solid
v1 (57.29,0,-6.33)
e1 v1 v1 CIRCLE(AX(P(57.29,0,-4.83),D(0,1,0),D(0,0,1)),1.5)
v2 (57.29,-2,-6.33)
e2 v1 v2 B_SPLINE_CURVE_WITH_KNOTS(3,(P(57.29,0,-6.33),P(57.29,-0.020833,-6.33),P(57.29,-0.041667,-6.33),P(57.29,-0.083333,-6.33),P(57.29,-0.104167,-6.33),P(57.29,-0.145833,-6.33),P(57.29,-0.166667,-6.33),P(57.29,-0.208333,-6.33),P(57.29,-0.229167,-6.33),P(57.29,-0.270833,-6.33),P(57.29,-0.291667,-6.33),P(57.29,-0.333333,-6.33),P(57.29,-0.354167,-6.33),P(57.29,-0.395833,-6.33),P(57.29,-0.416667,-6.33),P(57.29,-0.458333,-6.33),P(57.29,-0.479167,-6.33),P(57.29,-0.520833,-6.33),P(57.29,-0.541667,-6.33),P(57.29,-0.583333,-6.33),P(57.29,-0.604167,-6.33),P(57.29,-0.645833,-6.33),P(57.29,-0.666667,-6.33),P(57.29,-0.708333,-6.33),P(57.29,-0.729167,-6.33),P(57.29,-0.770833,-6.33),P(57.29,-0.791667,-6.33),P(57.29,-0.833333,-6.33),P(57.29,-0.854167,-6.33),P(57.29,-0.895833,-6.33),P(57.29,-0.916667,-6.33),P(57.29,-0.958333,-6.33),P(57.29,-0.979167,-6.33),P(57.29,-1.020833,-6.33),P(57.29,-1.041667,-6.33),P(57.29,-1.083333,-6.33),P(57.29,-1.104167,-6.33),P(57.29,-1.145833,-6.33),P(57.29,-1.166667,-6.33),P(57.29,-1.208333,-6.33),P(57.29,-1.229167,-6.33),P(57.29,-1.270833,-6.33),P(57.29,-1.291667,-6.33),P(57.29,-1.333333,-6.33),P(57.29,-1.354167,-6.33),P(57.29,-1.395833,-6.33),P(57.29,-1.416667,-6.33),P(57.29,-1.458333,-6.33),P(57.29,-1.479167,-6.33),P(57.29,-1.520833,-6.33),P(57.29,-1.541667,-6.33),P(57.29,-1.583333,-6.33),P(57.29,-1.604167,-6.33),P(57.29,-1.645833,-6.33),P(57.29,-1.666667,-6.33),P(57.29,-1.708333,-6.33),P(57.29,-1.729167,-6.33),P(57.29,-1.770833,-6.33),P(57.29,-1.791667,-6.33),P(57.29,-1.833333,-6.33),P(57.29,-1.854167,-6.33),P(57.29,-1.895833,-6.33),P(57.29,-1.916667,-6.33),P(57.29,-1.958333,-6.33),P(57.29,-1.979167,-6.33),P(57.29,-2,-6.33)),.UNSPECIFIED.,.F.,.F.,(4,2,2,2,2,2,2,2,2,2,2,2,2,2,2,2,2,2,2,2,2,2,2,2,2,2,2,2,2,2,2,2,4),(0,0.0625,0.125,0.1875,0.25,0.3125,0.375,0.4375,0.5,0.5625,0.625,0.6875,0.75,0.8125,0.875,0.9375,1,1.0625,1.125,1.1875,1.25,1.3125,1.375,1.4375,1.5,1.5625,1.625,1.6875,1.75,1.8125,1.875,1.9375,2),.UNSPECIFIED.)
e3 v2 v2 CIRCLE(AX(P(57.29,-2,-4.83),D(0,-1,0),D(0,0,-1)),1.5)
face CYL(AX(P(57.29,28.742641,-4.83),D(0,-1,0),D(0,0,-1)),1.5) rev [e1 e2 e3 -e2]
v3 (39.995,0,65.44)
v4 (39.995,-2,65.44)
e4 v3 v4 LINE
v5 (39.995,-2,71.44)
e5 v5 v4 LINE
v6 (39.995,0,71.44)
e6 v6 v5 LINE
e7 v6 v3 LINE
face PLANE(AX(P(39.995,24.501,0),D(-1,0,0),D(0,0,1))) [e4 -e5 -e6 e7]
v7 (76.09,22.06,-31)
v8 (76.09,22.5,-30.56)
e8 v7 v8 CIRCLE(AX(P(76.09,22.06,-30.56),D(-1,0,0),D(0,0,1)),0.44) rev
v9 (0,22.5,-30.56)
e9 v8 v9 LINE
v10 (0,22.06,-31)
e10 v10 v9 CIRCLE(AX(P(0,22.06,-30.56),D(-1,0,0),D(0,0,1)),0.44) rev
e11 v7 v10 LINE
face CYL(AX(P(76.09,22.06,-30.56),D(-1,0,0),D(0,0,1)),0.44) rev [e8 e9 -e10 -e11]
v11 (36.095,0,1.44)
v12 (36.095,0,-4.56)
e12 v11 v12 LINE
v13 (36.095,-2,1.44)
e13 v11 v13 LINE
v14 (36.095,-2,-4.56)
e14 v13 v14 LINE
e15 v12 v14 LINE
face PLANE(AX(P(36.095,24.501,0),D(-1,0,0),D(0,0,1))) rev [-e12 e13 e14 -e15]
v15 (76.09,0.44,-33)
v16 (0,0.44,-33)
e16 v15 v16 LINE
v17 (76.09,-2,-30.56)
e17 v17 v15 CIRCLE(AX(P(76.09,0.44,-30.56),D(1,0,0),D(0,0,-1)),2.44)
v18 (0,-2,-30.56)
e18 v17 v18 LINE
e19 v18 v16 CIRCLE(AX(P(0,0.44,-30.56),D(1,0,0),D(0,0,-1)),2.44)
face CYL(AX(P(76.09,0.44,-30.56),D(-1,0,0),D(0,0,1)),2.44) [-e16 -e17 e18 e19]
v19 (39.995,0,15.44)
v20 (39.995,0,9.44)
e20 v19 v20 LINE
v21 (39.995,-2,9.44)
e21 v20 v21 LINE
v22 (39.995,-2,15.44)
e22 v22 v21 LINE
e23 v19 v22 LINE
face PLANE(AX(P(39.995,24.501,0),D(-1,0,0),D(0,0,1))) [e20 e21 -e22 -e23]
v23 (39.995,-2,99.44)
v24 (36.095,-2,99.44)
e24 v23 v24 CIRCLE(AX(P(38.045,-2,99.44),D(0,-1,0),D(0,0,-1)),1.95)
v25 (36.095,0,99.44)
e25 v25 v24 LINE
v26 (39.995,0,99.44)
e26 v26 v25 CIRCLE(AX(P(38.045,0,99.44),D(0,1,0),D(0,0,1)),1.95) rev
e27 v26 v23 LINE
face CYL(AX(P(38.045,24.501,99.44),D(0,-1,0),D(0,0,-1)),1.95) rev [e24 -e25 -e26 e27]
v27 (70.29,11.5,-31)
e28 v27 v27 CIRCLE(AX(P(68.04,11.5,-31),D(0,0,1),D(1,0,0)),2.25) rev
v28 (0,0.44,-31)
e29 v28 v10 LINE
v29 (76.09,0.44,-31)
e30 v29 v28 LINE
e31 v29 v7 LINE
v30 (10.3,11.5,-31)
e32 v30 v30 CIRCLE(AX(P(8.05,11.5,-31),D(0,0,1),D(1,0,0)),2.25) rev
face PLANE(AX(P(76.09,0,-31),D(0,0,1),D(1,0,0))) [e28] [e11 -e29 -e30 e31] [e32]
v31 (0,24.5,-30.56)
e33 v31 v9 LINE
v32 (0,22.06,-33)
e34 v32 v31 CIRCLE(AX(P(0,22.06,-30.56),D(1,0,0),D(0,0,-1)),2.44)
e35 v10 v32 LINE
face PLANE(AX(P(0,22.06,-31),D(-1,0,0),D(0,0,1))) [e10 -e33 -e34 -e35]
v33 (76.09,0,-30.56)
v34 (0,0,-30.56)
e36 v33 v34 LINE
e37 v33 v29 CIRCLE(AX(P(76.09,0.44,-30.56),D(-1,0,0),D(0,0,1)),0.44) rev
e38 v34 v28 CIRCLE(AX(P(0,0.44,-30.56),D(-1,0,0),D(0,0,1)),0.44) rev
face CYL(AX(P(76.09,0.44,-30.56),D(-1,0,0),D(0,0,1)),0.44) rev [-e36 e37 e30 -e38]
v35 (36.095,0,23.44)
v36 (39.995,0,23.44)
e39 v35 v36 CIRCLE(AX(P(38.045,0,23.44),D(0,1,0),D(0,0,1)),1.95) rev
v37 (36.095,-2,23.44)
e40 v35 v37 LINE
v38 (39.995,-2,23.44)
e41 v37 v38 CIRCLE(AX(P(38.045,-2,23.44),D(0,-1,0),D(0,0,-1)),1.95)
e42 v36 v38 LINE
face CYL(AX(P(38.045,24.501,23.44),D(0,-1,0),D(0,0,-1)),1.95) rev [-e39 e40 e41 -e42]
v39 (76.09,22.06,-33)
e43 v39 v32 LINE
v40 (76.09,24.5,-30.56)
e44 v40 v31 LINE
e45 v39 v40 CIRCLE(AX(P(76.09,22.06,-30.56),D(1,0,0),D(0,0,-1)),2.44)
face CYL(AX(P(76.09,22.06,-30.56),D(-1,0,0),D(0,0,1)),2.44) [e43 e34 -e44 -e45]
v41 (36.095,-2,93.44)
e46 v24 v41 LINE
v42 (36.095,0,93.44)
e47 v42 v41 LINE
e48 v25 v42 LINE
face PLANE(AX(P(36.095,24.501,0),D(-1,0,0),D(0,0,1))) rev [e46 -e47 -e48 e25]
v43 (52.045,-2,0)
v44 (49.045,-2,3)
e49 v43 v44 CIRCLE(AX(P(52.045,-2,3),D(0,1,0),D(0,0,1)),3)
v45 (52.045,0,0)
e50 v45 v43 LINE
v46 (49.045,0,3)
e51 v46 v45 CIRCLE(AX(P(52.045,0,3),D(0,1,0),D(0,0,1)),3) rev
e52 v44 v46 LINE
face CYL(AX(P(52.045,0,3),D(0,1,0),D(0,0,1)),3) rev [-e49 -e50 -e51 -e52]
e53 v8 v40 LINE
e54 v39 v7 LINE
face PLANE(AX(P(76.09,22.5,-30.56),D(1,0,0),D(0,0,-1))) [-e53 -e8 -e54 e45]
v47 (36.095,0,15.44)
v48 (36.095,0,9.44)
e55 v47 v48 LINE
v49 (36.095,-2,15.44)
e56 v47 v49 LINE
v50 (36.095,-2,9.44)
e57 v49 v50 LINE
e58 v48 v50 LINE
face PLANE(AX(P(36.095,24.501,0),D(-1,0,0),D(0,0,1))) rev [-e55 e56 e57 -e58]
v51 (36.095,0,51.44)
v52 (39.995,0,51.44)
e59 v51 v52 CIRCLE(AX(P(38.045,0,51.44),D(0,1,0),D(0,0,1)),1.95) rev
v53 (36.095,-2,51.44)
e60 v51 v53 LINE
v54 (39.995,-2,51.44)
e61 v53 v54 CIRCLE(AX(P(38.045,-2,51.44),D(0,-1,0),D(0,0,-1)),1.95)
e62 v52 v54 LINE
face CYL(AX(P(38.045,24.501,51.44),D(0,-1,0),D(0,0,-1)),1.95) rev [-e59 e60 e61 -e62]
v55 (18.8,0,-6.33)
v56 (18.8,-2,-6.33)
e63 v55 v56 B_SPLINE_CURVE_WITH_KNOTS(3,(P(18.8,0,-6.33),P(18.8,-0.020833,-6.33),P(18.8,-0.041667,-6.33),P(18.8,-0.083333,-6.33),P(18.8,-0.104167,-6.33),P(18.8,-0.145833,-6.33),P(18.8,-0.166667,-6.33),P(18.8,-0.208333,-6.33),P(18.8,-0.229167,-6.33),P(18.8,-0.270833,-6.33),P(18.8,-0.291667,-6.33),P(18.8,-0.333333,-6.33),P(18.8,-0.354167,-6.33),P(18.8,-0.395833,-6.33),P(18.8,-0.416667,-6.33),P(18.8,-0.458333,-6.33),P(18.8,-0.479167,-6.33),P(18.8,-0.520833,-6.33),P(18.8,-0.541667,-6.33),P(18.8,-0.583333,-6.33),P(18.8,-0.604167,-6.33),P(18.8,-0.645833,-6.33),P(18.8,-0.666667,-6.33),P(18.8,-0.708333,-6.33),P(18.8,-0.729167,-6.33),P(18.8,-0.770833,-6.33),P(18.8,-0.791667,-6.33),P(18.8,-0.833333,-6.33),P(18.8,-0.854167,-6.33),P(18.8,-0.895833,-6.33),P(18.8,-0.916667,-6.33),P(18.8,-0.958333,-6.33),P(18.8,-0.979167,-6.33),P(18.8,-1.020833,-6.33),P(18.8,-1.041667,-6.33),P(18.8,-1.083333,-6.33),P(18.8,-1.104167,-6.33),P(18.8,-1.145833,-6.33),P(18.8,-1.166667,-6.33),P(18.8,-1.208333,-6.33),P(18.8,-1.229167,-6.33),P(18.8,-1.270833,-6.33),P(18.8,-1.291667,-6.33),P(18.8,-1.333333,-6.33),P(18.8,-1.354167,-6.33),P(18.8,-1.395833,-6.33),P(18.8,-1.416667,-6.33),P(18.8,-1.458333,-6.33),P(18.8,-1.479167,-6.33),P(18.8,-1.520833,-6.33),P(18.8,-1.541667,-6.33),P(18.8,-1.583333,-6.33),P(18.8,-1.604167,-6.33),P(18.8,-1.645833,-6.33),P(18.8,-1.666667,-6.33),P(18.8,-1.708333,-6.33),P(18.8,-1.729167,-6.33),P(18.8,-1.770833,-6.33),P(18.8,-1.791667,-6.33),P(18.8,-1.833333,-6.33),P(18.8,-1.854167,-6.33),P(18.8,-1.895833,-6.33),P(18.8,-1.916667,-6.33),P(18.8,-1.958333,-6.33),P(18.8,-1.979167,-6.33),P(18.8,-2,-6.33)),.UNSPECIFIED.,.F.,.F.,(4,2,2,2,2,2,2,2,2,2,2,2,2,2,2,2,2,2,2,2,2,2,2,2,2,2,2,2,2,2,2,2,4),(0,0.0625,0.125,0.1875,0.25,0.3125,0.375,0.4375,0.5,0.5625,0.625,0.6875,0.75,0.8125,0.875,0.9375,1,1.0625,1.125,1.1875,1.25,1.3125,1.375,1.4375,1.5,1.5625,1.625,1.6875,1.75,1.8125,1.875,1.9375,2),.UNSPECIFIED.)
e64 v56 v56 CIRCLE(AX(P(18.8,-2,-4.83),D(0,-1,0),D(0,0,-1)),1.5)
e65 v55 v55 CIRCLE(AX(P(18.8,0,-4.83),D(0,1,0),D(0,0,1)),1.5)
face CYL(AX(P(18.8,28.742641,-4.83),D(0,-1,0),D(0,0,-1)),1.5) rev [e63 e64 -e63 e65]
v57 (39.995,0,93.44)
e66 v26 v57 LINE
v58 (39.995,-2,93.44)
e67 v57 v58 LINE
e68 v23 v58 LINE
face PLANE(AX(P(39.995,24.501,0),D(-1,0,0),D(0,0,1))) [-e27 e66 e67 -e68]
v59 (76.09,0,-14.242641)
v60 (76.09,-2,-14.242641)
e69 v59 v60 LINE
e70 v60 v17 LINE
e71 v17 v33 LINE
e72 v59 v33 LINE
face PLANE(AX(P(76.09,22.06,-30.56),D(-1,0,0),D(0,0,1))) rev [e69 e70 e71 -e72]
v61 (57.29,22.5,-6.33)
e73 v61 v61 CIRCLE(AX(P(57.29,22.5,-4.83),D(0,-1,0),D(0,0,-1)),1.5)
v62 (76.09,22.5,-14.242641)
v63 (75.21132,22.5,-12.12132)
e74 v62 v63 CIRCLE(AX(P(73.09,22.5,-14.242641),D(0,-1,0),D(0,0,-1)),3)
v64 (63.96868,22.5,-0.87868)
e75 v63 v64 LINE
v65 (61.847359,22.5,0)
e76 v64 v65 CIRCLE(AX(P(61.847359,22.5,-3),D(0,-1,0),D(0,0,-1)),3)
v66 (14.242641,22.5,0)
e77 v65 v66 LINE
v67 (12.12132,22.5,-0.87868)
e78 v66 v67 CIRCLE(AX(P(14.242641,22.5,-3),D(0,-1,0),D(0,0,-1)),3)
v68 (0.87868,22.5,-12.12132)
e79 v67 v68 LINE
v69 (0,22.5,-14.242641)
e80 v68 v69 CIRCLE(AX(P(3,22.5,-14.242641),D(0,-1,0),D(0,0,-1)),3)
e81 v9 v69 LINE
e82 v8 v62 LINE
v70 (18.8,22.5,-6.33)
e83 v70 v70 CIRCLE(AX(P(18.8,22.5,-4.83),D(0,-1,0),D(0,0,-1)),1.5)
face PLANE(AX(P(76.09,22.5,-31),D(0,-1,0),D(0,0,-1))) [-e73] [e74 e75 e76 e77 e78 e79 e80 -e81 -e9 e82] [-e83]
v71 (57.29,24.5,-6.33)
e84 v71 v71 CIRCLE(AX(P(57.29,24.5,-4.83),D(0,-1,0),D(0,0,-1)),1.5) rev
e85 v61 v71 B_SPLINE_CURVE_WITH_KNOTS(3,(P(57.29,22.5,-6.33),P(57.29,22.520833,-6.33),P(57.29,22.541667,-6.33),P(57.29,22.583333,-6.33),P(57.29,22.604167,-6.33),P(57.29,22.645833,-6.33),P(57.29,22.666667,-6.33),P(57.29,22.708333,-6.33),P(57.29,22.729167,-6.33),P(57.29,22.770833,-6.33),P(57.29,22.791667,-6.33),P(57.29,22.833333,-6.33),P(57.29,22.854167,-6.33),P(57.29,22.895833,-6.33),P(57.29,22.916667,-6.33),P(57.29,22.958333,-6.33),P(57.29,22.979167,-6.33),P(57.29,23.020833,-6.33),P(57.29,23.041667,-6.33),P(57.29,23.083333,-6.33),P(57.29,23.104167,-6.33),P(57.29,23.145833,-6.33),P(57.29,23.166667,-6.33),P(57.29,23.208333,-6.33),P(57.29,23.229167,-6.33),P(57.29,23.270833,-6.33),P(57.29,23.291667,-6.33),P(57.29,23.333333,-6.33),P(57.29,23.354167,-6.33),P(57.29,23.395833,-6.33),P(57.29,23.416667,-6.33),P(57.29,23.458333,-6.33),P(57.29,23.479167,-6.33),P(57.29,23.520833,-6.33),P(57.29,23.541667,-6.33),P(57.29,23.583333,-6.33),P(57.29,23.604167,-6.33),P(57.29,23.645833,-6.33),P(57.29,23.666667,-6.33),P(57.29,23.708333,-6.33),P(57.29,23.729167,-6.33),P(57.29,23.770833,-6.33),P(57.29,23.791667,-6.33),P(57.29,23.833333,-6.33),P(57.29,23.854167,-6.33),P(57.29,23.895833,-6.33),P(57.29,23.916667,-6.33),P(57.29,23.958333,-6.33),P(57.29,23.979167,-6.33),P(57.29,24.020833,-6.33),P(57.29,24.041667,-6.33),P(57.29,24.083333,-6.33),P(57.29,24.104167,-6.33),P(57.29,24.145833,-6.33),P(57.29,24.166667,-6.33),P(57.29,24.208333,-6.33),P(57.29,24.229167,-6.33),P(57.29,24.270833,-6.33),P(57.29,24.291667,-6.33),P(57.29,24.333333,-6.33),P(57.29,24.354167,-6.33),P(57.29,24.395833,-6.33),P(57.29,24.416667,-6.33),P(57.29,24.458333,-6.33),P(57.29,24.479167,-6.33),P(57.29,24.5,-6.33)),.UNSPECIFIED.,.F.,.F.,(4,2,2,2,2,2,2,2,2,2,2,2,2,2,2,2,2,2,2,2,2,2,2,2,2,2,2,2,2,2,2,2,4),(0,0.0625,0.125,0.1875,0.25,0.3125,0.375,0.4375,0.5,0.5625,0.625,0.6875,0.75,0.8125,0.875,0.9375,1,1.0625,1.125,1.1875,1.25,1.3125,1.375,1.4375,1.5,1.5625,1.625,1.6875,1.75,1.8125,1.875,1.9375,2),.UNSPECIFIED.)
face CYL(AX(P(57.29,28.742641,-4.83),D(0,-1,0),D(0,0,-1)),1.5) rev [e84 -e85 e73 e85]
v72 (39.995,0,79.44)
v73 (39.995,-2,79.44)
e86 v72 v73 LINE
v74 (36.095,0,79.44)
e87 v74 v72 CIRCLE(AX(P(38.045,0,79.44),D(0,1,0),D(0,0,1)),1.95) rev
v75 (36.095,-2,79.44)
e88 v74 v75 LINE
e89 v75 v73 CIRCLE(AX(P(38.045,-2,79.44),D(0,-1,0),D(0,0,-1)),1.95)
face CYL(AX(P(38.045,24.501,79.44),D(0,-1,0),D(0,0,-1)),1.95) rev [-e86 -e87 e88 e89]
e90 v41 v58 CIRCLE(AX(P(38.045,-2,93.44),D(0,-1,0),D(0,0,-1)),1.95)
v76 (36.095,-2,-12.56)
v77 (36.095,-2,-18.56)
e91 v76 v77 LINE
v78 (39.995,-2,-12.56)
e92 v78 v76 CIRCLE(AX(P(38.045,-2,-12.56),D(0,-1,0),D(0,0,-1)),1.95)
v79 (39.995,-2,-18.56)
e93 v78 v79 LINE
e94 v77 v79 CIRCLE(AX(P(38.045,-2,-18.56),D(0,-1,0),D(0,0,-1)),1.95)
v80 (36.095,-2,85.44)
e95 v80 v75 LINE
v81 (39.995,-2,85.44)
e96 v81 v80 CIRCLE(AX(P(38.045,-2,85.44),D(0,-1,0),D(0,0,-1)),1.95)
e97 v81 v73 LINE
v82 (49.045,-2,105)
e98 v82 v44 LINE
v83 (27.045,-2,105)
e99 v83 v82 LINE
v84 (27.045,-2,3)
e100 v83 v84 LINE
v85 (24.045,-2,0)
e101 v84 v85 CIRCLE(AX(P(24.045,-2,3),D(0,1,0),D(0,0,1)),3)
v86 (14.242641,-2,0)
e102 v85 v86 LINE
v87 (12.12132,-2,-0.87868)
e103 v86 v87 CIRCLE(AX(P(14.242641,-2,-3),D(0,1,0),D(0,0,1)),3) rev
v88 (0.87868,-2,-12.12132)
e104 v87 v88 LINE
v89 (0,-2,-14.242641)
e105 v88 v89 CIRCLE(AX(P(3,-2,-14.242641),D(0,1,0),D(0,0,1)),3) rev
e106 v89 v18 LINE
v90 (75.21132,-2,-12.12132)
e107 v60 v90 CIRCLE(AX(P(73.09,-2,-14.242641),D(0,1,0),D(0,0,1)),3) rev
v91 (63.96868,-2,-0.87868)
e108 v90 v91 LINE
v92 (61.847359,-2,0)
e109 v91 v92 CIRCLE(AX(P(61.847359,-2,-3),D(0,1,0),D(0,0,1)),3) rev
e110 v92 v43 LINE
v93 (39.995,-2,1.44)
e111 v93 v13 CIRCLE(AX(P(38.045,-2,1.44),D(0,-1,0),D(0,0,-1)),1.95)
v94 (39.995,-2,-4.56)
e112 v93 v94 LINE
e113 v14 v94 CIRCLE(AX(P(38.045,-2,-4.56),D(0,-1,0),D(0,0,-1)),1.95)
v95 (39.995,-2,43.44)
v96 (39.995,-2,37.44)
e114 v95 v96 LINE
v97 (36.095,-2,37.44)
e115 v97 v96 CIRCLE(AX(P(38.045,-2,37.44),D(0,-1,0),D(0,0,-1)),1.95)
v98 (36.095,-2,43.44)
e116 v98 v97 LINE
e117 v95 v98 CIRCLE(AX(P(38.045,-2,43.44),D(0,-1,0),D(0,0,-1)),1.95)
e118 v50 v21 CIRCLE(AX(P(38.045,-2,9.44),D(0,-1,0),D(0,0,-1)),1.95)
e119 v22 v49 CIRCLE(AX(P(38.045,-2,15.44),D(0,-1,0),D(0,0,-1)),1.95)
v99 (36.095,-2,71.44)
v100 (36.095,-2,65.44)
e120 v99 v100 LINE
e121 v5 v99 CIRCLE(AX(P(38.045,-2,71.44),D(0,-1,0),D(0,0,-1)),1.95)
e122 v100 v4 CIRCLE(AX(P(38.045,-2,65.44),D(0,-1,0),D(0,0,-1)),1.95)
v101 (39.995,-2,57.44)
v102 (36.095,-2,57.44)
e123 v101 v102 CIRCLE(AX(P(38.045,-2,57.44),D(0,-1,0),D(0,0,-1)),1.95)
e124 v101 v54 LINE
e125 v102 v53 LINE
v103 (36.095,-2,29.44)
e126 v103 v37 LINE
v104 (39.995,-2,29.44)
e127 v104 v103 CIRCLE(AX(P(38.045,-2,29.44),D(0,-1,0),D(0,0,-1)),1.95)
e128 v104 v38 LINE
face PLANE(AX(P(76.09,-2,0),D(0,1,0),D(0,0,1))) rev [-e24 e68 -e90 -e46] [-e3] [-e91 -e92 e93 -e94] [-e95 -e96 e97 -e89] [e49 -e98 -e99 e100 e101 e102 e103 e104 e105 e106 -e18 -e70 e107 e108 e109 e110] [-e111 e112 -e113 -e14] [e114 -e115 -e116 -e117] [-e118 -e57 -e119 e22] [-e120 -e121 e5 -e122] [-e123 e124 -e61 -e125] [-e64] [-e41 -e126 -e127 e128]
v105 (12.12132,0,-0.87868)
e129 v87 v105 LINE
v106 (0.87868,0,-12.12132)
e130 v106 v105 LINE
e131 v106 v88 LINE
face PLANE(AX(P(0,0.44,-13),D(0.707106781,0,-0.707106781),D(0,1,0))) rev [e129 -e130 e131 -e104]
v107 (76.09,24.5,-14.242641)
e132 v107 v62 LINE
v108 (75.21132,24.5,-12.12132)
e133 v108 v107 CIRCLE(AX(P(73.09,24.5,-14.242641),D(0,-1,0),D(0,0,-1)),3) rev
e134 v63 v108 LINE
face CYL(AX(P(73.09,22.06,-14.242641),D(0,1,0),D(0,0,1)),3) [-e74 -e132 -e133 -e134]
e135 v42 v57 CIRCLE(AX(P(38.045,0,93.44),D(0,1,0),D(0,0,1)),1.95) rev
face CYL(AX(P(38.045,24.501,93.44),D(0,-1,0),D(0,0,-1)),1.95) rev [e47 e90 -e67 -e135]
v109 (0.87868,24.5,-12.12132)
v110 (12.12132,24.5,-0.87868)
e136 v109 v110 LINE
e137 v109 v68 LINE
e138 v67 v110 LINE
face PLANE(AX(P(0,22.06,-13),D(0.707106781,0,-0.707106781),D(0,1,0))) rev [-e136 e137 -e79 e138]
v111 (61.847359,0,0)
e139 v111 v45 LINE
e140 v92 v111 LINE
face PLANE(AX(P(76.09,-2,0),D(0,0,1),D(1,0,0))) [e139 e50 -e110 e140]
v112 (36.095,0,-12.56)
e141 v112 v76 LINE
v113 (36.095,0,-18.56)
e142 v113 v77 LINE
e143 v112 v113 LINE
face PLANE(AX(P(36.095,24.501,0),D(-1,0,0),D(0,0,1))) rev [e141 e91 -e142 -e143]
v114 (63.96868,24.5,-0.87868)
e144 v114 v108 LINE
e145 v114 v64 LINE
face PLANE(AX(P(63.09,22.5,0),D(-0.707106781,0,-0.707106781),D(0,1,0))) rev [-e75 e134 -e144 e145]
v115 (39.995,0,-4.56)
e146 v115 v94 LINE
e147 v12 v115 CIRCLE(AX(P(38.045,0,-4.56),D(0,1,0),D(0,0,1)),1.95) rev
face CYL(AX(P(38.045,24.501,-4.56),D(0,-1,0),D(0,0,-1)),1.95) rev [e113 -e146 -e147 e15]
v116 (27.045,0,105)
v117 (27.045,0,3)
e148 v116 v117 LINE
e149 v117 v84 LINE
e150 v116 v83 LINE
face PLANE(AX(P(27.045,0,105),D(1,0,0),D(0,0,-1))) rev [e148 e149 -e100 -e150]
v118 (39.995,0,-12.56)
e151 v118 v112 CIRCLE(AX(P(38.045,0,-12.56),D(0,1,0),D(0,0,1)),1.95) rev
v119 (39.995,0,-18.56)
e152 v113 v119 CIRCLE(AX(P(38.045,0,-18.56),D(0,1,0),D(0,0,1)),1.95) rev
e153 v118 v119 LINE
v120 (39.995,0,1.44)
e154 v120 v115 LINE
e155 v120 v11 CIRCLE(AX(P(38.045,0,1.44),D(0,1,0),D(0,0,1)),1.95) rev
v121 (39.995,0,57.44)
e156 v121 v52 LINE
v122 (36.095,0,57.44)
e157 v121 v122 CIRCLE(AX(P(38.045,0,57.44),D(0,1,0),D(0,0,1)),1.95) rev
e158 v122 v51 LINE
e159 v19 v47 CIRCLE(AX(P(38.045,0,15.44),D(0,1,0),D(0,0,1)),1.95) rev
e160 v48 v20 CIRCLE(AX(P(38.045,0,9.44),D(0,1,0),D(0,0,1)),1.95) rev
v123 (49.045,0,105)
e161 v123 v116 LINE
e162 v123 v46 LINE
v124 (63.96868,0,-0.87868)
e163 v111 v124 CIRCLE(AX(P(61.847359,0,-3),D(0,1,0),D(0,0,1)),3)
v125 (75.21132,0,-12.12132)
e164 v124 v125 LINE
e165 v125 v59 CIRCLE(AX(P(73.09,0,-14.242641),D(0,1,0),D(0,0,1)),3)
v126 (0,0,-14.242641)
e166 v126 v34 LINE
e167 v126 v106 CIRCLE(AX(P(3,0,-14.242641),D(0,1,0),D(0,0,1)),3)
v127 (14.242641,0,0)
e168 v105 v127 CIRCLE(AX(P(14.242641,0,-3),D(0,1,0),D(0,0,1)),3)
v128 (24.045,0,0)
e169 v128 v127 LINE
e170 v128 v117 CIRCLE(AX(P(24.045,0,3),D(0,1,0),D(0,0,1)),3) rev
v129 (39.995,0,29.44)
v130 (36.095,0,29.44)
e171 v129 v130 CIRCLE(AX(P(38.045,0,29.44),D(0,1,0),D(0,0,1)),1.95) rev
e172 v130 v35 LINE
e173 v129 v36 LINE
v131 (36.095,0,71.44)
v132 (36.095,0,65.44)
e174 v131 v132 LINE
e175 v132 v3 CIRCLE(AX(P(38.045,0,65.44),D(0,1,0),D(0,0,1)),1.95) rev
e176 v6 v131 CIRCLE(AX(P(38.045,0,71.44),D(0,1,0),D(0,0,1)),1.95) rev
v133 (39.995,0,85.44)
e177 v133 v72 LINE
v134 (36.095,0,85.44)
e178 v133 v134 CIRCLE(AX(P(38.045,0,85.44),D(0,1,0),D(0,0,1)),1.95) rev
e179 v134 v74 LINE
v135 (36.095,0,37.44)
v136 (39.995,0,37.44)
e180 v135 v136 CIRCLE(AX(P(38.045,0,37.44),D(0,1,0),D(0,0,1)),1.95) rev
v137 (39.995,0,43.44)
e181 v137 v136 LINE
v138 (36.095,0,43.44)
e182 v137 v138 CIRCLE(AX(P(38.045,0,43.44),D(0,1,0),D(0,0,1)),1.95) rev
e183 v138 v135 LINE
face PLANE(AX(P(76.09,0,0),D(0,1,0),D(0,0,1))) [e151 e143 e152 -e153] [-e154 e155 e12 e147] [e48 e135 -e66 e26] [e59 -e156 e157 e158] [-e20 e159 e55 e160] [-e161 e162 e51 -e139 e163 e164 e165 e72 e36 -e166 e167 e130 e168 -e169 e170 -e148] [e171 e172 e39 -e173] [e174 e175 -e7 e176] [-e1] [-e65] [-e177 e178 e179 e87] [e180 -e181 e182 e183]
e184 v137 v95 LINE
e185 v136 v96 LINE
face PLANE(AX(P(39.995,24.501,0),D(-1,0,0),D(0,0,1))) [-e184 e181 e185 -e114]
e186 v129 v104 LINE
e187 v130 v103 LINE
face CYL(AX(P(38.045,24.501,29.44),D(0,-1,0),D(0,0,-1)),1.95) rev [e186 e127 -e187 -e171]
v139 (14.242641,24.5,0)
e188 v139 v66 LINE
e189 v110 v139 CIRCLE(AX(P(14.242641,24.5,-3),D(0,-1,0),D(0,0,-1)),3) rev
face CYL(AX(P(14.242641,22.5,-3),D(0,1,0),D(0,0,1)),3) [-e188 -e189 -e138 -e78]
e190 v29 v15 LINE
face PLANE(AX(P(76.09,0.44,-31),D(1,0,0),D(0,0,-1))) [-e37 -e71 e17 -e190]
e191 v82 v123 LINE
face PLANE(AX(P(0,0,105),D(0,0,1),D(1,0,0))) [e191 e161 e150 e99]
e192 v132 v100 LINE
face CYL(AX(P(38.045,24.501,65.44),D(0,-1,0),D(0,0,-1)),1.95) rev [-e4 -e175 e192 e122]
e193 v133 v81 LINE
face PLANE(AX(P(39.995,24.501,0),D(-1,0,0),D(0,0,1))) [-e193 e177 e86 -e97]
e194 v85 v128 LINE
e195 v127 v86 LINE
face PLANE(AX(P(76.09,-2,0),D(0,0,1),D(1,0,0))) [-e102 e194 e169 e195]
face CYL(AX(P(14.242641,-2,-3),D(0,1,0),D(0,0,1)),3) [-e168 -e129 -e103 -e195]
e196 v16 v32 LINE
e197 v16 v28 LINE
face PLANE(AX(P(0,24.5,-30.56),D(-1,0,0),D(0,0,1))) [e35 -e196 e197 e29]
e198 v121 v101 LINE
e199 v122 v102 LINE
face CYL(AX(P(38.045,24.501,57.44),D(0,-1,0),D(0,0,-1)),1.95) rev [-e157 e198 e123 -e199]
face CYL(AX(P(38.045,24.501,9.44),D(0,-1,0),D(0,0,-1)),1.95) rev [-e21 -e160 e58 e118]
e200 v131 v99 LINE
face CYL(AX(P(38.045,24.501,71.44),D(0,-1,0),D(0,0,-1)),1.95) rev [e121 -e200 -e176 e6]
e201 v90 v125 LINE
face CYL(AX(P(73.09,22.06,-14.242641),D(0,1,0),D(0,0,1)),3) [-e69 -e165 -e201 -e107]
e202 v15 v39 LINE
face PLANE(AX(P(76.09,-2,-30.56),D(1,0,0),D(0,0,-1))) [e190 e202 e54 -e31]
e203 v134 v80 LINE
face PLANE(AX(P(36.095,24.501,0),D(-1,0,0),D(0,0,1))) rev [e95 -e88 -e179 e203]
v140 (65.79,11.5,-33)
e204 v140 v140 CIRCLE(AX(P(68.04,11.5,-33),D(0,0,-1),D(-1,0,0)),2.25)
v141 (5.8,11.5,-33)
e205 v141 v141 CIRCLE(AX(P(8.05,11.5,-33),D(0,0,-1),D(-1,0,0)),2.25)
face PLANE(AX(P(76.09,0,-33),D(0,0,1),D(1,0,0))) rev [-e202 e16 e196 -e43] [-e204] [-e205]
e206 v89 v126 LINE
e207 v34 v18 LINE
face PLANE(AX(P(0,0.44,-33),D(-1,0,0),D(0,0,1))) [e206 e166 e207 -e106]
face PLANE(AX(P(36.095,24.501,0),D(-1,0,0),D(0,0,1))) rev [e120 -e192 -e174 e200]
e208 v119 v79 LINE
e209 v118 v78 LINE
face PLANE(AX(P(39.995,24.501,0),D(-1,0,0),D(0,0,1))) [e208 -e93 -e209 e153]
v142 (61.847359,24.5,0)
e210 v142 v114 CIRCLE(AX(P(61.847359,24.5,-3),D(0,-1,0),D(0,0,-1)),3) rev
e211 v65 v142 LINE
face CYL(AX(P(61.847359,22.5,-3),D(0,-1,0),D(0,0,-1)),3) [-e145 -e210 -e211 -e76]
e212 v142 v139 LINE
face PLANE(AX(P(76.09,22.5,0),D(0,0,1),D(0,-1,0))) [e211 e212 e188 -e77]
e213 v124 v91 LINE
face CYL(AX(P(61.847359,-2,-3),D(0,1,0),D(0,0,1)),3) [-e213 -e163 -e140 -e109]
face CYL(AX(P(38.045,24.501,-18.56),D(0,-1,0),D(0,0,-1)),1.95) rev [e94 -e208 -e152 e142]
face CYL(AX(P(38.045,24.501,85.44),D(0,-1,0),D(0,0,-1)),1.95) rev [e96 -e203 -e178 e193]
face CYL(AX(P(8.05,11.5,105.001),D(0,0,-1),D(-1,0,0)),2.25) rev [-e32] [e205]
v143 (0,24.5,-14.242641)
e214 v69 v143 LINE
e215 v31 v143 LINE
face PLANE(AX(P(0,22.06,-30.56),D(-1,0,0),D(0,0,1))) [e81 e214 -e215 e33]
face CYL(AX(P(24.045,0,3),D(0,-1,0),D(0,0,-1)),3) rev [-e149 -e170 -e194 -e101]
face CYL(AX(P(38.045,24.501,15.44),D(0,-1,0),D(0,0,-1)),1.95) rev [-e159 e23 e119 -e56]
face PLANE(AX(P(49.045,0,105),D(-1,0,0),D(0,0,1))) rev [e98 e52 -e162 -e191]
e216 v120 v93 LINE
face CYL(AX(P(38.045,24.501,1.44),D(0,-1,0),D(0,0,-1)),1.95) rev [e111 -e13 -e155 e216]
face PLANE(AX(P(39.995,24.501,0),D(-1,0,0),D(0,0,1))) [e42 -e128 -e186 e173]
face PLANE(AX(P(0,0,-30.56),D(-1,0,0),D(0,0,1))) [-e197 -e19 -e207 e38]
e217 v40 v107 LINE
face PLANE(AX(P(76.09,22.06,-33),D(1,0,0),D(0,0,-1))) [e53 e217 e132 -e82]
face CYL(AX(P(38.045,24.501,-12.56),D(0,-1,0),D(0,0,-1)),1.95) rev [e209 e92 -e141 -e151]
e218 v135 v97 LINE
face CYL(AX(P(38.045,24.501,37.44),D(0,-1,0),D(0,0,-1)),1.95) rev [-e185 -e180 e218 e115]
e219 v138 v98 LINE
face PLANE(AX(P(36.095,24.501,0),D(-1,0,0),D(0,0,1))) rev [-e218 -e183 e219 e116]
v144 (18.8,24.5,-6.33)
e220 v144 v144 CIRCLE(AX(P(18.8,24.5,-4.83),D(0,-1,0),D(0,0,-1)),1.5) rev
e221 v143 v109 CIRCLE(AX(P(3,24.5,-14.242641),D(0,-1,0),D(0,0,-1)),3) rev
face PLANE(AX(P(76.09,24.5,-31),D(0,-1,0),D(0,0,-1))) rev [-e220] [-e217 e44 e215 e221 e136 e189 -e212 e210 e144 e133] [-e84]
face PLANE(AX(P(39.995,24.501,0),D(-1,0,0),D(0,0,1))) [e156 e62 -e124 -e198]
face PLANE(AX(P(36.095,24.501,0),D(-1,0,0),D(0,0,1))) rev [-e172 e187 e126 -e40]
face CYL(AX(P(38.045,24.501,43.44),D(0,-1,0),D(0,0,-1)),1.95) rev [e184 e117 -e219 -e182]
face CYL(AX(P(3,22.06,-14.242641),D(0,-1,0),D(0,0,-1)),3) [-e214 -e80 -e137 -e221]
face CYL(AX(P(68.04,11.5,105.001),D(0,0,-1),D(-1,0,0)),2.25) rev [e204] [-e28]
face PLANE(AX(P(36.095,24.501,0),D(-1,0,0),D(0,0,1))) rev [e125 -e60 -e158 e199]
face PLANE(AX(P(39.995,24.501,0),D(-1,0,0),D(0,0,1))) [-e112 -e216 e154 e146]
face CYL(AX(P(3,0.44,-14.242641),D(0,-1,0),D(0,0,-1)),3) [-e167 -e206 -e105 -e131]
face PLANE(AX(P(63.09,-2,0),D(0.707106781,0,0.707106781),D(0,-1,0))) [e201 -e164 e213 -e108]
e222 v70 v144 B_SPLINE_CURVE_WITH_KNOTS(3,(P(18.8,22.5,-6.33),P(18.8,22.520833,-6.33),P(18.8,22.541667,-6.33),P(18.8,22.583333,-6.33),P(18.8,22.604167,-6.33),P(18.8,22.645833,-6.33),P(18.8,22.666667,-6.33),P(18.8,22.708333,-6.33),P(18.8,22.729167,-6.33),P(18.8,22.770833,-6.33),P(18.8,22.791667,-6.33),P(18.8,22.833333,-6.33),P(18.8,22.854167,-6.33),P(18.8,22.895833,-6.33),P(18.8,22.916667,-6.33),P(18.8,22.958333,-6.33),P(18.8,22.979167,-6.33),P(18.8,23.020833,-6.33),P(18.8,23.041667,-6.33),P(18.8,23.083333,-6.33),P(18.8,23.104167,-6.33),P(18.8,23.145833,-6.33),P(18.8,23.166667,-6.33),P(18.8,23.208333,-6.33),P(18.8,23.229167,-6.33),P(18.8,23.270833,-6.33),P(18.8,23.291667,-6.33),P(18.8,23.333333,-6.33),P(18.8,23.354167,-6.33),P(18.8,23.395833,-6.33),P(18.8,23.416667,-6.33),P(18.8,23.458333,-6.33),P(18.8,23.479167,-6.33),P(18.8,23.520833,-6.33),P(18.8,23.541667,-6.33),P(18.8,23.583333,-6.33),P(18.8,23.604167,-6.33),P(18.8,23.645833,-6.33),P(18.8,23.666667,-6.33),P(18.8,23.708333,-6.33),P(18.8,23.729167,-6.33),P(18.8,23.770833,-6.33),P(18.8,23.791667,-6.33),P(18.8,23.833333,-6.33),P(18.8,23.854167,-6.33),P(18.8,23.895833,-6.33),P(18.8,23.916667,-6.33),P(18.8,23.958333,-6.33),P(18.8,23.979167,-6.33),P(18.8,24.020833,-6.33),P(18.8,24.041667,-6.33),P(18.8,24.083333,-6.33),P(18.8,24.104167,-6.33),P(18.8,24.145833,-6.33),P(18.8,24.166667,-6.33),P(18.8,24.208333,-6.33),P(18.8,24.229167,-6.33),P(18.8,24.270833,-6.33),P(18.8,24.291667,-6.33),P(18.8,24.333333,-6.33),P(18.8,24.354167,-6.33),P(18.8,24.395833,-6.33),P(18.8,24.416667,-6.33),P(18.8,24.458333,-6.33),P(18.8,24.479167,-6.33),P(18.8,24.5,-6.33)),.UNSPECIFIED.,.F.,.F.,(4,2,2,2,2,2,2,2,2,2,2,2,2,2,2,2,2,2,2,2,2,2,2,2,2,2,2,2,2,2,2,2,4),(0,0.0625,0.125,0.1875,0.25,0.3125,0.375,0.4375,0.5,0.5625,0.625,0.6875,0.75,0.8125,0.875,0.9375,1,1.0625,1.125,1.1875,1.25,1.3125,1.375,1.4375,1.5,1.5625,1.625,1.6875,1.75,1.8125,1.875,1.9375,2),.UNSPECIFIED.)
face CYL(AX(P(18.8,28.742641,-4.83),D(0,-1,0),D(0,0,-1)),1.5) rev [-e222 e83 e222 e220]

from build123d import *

# Parameters (mm, degrees)
BASE_FLANGE1_DEPTH  = 76.09
SKETCH6_W           = 22
SKETCH6_H           = 2
BOSS_EXTRUDE1_DEPTH = 105
FILLET2_R           = 3
CHAMFER1_SIZE       = 13
CHAMFER2_SIZE       = 13
FILLET3_R           = 3
CUT_EXTRUDE1_REACH  = 134.352
CUT_EXTRUDE2_REACH  = 134.352
SKETCH7_3_R         = 1.5
CUT_EXTRUDE3_REACH  = 161.48
SKETCH8_R           = 2.25


# Sheet-metal steps are written as plain solids
with BuildPart() as part:
    # Sketch1 → Base-Flange1 (new body)
    with BuildSketch(Plane(origin=(0, 0, 0), x_dir=(0, 0, -1), z_dir=(1, 0, 0))):
        with BuildLine():
            Line((0, 0), (30.56, 0))
            ThreePointArc((30.56, 0), (30.871126984, 0.128873016), (31, 0.44))
            Line((31, 0.44), (31, 22.06))
            ThreePointArc((31, 22.06), (30.871126984, 22.371126984), (30.56, 22.5))
            Line((30.56, 22.5), (0, 22.5))
            Line((0, 22.5), (0, 24.5))
            Line((0, 24.5), (30.56, 24.5))
            ThreePointArc((30.56, 24.5), (32.285340546, 23.785340546), (33, 22.06))
            Line((33, 22.06), (33, 0.44))
            ThreePointArc((33, 0.44), (32.285340546, -1.285340546), (30.56, -2))
            Line((30.56, -2), (0, -2))
            Line((0, -2), (0, 0))
        make_face()
    extrude(amount=BASE_FLANGE1_DEPTH)

    # Sketch6 → Boss-Extrude1 (add)
    with BuildSketch(Plane.XY):
        with Locations((38.045, -1)):
            Rectangle(SKETCH6_W, SKETCH6_H)
    extrude(amount=BOSS_EXTRUDE1_DEPTH)

    # Fillet2
    fillet2_edges = [part.edges().sort_by_distance(p)[0] for p in [
        (49.045, -1, 0),
        (27.045, -1, 0),
    ]]
    fillet(fillet2_edges, radius=FILLET2_R)

    # Chamfer1
    chamfer1_edges = [part.edges().sort_by_distance(p)[0] for p in [
        (0, -1, 0),
        (0, 23.5, 0),
    ]]
    chamfer(chamfer1_edges, length=CHAMFER1_SIZE)

    # Chamfer2
    chamfer2_edges = [part.edges().sort_by_distance(p)[0] for p in [
        (76.09, -1, 0),
        (76.09, 23.5, 0),
    ]]
    chamfer(chamfer2_edges, length=CHAMFER2_SIZE)

    # Fillet3
    fillet3_edges = [part.edges().sort_by_distance(p)[0] for p in [
        (76.09, -1, -13),
        (76.09, 23.5, -13),
        (63.09, -1, 0),
        (63.09, 23.5, 0),
        (13, 23.5, 0),
        (13, -1, 0),
        (0, -1, -13),
        (0, 23.5, -13),
    ]]
    fillet(fillet3_edges, radius=FILLET3_R)

    # Sketch7 → Cut-Extrude1 (cut, up to next)
    with BuildSketch(Plane.XZ.offset(2), mode=Mode.PRIVATE) as cut_extrude1_sk1:
        with BuildLine():
            Line((39.995, -18.56), (39.995, -12.56))
            ThreePointArc((39.995, -12.56), (38.045, -10.61), (36.095, -12.56))
            Line((36.095, -12.56), (36.095, -18.56))
            ThreePointArc((36.095, -18.56), (38.045, -20.51), (39.995, -18.56))
        make_face()
    cut_extrude1_tool1 = extrude(cut_extrude1_sk1.sketch, amount=-CUT_EXTRUDE1_REACH, mode=Mode.PRIVATE) & part.part
    # Sketch7 → Cut-Extrude1 (cut, up to next)
    with BuildSketch(Plane.XZ.offset(2), mode=Mode.PRIVATE) as cut_extrude1_sk2:
        with BuildLine():
            Line((39.995, -4.56), (39.995, 1.44))
            ThreePointArc((39.995, 1.44), (38.045, 3.39), (36.095, 1.44))
            Line((36.095, 1.44), (36.095, -4.56))
            ThreePointArc((36.095, -4.56), (38.045, -6.51), (39.995, -4.56))
        make_face()
    cut_extrude1_tool2 = extrude(cut_extrude1_sk2.sketch, amount=-CUT_EXTRUDE1_REACH, mode=Mode.PRIVATE) & part.part
    # Sketch7 → Cut-Extrude1 (cut, up to next)
    with BuildSketch(Plane.XZ.offset(2), mode=Mode.PRIVATE) as cut_extrude1_sk3:
        with BuildLine():
            Line((39.995, 9.44), (39.995, 15.44))
            ThreePointArc((39.995, 15.44), (38.045, 17.39), (36.095, 15.44))
            Line((36.095, 15.44), (36.095, 9.44))
            ThreePointArc((36.095, 9.44), (38.045, 7.49), (39.995, 9.44))
        make_face()
    cut_extrude1_tool3 = extrude(cut_extrude1_sk3.sketch, amount=-CUT_EXTRUDE1_REACH, mode=Mode.PRIVATE) & part.part
    # Sketch7 → Cut-Extrude1 (cut, up to next)
    with BuildSketch(Plane.XZ.offset(2), mode=Mode.PRIVATE) as cut_extrude1_sk4:
        with BuildLine():
            Line((39.995, 23.44), (39.995, 29.44))
            ThreePointArc((39.995, 29.44), (38.045, 31.39), (36.095, 29.44))
            Line((36.095, 29.44), (36.095, 23.44))
            ThreePointArc((36.095, 23.44), (38.045, 21.49), (39.995, 23.44))
        make_face()
    cut_extrude1_tool4 = extrude(cut_extrude1_sk4.sketch, amount=-CUT_EXTRUDE1_REACH, mode=Mode.PRIVATE) & part.part
    # Sketch7 → Cut-Extrude1 (cut, up to next)
    with BuildSketch(Plane.XZ.offset(2), mode=Mode.PRIVATE) as cut_extrude1_sk5:
        with BuildLine():
            Line((39.995, 37.44), (39.995, 43.44))
            ThreePointArc((39.995, 43.44), (38.045, 45.39), (36.095, 43.44))
            Line((36.095, 43.44), (36.095, 37.44))
            ThreePointArc((36.095, 37.44), (38.045, 35.49), (39.995, 37.44))
        make_face()
    cut_extrude1_tool5 = extrude(cut_extrude1_sk5.sketch, amount=-CUT_EXTRUDE1_REACH, mode=Mode.PRIVATE) & part.part
    # Sketch7 → Cut-Extrude1 (cut, up to next)
    with BuildSketch(Plane.XZ.offset(2), mode=Mode.PRIVATE) as cut_extrude1_sk6:
        with BuildLine():
            Line((39.995, 51.44), (39.995, 57.44))
            ThreePointArc((39.995, 57.44), (38.045, 59.39), (36.095, 57.44))
            Line((36.095, 57.44), (36.095, 51.44))
            ThreePointArc((36.095, 51.44), (38.045, 49.49), (39.995, 51.44))
        make_face()
    cut_extrude1_tool6 = extrude(cut_extrude1_sk6.sketch, amount=-CUT_EXTRUDE1_REACH, mode=Mode.PRIVATE) & part.part
    # Sketch7 → Cut-Extrude1 (cut, up to next)
    with BuildSketch(Plane.XZ.offset(2), mode=Mode.PRIVATE) as cut_extrude1_sk7:
        with BuildLine():
            Line((39.995, 65.44), (39.995, 71.44))
            ThreePointArc((39.995, 71.44), (38.045, 73.39), (36.095, 71.44))
            Line((36.095, 71.44), (36.095, 65.44))
            ThreePointArc((36.095, 65.44), (38.045, 63.49), (39.995, 65.44))
        make_face()
    cut_extrude1_tool7 = extrude(cut_extrude1_sk7.sketch, amount=-CUT_EXTRUDE1_REACH, mode=Mode.PRIVATE) & part.part
    # Sketch7 → Cut-Extrude1 (cut, up to next)
    with BuildSketch(Plane.XZ.offset(2), mode=Mode.PRIVATE) as cut_extrude1_sk8:
        with BuildLine():
            Line((39.995, 79.44), (39.995, 85.44))
            ThreePointArc((39.995, 85.44), (38.045, 87.39), (36.095, 85.44))
            Line((36.095, 85.44), (36.095, 79.44))
            ThreePointArc((36.095, 79.44), (38.045, 77.49), (39.995, 79.44))
        make_face()
    cut_extrude1_tool8 = extrude(cut_extrude1_sk8.sketch, amount=-CUT_EXTRUDE1_REACH, mode=Mode.PRIVATE) & part.part
    # Sketch7 → Cut-Extrude1 (cut, up to next)
    with BuildSketch(Plane.XZ.offset(2), mode=Mode.PRIVATE) as cut_extrude1_sk9:
        with BuildLine():
            Line((39.995, 93.44), (39.995, 99.44))
            ThreePointArc((39.995, 99.44), (38.045, 101.39), (36.095, 99.44))
            Line((36.095, 99.44), (36.095, 93.44))
            ThreePointArc((36.095, 93.44), (38.045, 91.49), (39.995, 93.44))
        make_face()
    cut_extrude1_tool9 = extrude(cut_extrude1_sk9.sketch, amount=-CUT_EXTRUDE1_REACH, mode=Mode.PRIVATE) & part.part
    add(cut_extrude1_tool1.solids().sort_by_distance((38.045, -2, -15.56))[0], mode=Mode.SUBTRACT)
    add(cut_extrude1_tool2.solids().sort_by_distance((38.045, -2, -1.56))[0], mode=Mode.SUBTRACT)
    add(cut_extrude1_tool3.solids().sort_by_distance((38.045, -2, 12.44))[0], mode=Mode.SUBTRACT)
    add(cut_extrude1_tool4.solids().sort_by_distance((38.045, -2, 26.44))[0], mode=Mode.SUBTRACT)
    add(cut_extrude1_tool5.solids().sort_by_distance((38.045, -2, 40.44))[0], mode=Mode.SUBTRACT)
    add(cut_extrude1_tool6.solids().sort_by_distance((38.045, -2, 54.44))[0], mode=Mode.SUBTRACT)
    add(cut_extrude1_tool7.solids().sort_by_distance((38.045, -2, 68.44))[0], mode=Mode.SUBTRACT)
    add(cut_extrude1_tool8.solids().sort_by_distance((38.045, -2, 82.44))[0], mode=Mode.SUBTRACT)
    add(cut_extrude1_tool9.solids().sort_by_distance((38.045, -2, 96.44))[0], mode=Mode.SUBTRACT)

    # Cut-Extrude2: up to this face of the body (flat: up to its plane)
    cut_extrude2_end = Plane(part.part.faces().sort_by_distance((38.045, 24.5, -16.141358018))[0])
    # Sketch7<3> → Cut-Extrude2 (cut, up to the picked face)
    with BuildSketch(Plane.XZ.offset(2), mode=Mode.PRIVATE) as cut_extrude2_sk1:
        with Locations(Location((18.8, -4.83, 0), (0, 0, 270))):
            Circle(SKETCH7_3_R)
    cut_extrude2_tool1 = split(extrude(cut_extrude2_sk1.sketch, amount=-CUT_EXTRUDE2_REACH, mode=Mode.PRIVATE), bisect_by=cut_extrude2_end, keep=Keep.BOTH, mode=Mode.PRIVATE)
    # Sketch7<3> → Cut-Extrude2 (cut, up to the picked face)
    with BuildSketch(Plane.XZ.offset(2), mode=Mode.PRIVATE) as cut_extrude2_sk2:
        with Locations(Location((57.29, -4.83, 0), (0, 0, 270))):
            Circle(SKETCH7_3_R)
    cut_extrude2_tool2 = split(extrude(cut_extrude2_sk2.sketch, amount=-CUT_EXTRUDE2_REACH, mode=Mode.PRIVATE), bisect_by=cut_extrude2_end, keep=Keep.BOTH, mode=Mode.PRIVATE)
    add(cut_extrude2_tool1.solids().sort_by(Axis((18.8, -2, -4.83), (0, 1, 0)))[0], mode=Mode.SUBTRACT)
    add(cut_extrude2_tool2.solids().sort_by(Axis((57.29, -2, -4.83), (0, 1, 0)))[0], mode=Mode.SUBTRACT)

    # Sketch8 → Cut-Extrude3 (cut, up to next)
    with BuildSketch(Plane(origin=(0, 0, -33), x_dir=(-1, 0, 0), z_dir=(0, 0, -1)), mode=Mode.PRIVATE) as cut_extrude3_sk1:
        with Locations((-8.05, 11.5)):
            Circle(SKETCH8_R)
    cut_extrude3_tool1 = extrude(cut_extrude3_sk1.sketch, amount=-CUT_EXTRUDE3_REACH, mode=Mode.PRIVATE) & part.part
    # Sketch8 → Cut-Extrude3 (cut, up to next)
    with BuildSketch(Plane(origin=(0, 0, -33), x_dir=(-1, 0, 0), z_dir=(0, 0, -1)), mode=Mode.PRIVATE) as cut_extrude3_sk2:
        with Locations((-68.04, 11.5)):
            Circle(SKETCH8_R)
    cut_extrude3_tool2 = extrude(cut_extrude3_sk2.sketch, amount=-CUT_EXTRUDE3_REACH, mode=Mode.PRIVATE) & part.part
    add(cut_extrude3_tool1.solids().sort_by_distance((8.05, 11.5, -33))[0], mode=Mode.SUBTRACT)
    add(cut_extrude3_tool2.solids().sort_by_distance((68.04, 11.5, -33))[0], mode=Mode.SUBTRACT)


solid = part.part
